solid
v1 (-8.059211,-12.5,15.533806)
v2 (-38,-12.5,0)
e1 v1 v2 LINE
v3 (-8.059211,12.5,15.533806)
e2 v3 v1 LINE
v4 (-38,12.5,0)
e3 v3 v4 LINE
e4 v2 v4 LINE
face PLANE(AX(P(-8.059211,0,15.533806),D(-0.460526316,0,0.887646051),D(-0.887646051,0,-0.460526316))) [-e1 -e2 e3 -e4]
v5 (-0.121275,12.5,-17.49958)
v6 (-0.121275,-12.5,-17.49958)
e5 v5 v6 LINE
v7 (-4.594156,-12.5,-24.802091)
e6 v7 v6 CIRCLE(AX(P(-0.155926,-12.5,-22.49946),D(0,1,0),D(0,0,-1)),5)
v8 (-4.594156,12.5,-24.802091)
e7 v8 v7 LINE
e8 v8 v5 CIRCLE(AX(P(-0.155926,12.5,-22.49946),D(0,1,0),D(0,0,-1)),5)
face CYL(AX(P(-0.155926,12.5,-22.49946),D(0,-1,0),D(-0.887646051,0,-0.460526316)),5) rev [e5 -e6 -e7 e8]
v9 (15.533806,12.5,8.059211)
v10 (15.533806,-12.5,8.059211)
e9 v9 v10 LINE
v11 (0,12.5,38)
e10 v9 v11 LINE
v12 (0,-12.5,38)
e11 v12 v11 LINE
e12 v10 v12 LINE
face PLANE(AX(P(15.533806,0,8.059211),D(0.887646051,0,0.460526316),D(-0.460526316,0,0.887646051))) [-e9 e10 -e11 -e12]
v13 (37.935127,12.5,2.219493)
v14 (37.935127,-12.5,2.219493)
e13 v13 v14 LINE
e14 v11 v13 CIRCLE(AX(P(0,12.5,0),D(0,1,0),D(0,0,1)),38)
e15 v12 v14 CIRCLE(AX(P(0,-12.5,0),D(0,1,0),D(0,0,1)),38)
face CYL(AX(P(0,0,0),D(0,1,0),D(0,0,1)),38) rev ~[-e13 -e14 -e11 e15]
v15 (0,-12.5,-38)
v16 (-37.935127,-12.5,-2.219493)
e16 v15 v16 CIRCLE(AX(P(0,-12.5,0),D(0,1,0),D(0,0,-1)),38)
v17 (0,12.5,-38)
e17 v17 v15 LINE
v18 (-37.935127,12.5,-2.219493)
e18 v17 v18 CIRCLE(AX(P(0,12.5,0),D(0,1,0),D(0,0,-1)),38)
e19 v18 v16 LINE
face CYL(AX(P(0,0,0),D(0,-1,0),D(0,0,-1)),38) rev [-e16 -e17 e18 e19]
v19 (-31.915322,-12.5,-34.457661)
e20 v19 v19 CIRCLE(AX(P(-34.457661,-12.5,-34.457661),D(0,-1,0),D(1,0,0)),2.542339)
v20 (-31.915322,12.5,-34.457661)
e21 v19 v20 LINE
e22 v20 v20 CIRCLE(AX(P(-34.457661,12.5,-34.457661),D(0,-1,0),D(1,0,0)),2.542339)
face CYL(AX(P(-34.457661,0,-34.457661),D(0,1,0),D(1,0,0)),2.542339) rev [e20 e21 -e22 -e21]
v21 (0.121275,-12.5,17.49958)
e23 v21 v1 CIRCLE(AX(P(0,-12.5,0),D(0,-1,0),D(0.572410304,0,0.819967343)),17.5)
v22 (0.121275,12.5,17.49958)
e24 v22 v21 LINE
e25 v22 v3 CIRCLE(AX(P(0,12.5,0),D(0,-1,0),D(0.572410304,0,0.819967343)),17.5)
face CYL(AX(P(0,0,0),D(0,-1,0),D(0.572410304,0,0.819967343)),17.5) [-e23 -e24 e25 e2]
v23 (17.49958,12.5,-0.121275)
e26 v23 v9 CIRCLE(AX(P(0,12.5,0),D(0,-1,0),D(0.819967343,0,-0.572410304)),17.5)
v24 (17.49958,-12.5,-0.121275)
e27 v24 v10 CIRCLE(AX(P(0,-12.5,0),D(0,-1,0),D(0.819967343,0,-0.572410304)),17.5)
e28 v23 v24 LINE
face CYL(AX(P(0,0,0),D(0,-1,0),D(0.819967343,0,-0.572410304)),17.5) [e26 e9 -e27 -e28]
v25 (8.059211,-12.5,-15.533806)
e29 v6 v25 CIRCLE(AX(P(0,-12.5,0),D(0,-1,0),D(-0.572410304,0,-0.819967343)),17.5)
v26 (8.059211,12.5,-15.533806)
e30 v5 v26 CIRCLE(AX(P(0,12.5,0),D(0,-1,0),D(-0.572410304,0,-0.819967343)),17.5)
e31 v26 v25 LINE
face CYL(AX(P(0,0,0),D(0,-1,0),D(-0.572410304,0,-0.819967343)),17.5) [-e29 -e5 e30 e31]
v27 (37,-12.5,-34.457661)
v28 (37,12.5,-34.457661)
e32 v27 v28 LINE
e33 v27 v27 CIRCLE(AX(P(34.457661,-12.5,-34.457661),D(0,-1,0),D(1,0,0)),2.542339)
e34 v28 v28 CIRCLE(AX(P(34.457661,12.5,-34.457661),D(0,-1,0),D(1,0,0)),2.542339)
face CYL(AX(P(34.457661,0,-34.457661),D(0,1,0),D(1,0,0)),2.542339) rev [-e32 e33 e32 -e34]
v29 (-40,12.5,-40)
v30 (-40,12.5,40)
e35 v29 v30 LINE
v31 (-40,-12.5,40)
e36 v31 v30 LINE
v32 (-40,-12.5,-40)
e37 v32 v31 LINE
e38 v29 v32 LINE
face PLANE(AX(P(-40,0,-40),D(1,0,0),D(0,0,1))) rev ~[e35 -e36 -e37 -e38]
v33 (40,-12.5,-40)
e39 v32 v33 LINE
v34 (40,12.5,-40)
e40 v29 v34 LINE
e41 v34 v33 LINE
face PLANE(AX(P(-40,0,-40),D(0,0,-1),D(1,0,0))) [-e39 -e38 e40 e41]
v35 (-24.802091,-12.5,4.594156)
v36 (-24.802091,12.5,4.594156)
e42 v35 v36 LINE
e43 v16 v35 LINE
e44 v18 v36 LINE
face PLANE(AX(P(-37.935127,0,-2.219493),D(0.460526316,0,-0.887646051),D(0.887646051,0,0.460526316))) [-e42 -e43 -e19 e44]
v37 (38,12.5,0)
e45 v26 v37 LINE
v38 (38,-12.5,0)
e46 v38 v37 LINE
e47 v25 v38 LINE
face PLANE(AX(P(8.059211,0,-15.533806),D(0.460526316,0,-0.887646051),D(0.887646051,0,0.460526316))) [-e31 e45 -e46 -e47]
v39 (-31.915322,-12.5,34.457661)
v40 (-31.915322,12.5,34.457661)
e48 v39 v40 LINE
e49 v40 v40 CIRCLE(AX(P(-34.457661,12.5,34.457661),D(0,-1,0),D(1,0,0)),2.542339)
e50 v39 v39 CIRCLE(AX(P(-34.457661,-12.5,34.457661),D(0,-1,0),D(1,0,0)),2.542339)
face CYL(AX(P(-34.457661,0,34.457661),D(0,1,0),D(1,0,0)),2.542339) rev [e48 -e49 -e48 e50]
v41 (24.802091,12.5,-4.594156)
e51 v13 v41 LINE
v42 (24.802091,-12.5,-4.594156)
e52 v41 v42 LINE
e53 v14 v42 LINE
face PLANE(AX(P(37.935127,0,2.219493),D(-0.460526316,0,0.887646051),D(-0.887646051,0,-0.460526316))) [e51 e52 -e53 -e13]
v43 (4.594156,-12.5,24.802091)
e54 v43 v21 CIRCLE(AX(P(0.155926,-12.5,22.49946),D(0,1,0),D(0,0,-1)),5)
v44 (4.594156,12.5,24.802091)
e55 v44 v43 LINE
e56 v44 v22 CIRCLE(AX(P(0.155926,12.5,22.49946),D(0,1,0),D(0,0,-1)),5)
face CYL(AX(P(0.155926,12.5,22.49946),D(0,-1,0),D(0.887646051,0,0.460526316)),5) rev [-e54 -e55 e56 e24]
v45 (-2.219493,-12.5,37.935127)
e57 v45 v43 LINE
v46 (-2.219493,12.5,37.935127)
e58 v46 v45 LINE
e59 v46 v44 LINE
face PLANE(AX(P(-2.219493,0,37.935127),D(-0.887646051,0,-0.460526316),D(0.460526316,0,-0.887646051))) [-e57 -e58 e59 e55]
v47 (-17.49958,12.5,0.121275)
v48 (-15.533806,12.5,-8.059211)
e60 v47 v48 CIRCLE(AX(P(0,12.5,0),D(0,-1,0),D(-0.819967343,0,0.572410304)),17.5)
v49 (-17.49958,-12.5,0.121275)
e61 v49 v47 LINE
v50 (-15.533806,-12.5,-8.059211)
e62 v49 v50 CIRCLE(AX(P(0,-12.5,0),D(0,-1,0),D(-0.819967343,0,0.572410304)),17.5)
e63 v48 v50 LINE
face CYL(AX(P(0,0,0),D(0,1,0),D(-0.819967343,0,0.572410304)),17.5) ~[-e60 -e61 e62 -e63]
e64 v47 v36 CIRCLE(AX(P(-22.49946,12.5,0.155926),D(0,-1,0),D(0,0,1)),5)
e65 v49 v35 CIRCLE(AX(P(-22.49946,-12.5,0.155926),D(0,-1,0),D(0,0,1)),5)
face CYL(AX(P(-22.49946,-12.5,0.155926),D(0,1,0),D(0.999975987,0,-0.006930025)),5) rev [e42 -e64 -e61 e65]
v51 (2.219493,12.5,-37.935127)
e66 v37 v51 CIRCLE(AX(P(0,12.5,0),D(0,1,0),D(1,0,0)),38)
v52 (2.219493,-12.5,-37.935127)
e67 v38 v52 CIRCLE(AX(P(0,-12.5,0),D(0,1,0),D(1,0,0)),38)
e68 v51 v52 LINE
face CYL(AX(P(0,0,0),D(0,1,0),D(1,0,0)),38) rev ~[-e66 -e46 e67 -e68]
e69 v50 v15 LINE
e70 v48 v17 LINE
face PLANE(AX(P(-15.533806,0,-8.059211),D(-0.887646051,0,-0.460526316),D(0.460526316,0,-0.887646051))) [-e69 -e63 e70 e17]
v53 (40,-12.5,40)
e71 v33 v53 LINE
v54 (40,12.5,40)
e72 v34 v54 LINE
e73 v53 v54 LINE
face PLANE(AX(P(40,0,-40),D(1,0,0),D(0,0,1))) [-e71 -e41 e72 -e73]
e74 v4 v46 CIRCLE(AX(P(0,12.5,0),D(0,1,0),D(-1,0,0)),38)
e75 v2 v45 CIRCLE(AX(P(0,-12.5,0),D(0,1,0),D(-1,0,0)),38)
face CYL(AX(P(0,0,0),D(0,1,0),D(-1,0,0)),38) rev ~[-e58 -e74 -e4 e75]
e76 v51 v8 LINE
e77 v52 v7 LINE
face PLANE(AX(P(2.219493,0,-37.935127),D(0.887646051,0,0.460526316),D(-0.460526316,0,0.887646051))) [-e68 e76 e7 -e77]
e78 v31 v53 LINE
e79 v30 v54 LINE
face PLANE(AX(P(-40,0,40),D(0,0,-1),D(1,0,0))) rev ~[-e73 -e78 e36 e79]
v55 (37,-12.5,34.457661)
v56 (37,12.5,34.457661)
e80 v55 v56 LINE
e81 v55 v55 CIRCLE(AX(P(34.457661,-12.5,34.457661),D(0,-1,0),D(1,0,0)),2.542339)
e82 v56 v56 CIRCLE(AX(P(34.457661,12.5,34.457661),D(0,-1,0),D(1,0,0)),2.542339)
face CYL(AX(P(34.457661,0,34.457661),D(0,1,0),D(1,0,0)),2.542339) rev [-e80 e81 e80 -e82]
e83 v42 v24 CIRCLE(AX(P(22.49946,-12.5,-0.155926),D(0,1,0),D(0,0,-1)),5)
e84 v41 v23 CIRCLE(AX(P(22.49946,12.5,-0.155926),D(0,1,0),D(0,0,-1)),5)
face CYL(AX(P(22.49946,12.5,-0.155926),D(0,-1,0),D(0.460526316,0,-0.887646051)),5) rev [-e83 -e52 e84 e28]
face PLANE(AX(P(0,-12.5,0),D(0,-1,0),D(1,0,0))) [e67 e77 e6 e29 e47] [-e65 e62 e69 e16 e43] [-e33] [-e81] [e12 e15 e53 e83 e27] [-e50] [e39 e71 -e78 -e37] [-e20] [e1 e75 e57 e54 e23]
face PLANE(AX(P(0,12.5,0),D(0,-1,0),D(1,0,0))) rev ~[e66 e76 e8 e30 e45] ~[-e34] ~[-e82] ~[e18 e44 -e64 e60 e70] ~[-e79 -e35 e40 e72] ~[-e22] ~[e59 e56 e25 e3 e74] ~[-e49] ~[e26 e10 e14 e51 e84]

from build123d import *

# Parameters (mm, degrees)
F0_W     = 80
F0_H     = 80
F0_R     = 2.5423391552
F1_DEPTH = 12.5
F2_R     = 5


with BuildPart() as f1:
    # F0 (on Front) → F1 (new body, symmetric)
    with BuildSketch(Plane.XZ):
        Rectangle(F0_W, F0_H)
        with Locations((-34.4576608448, -34.4576608448)):
            Circle(F0_R, mode=Mode.SUBTRACT)
        with BuildLine():
            Line((-37.9351268711, -2.219493022), (-14.3494285056, 10.01718032))
            ThreePointArc((-14.3494285056, 10.01718032), (-17.4625571186, 1.1441585906), (-15.5338058985, -8.0592105263))
            Line((-15.5338058985, -8.0592105263), (0, -38))
            ThreePointArc((0, -38), (-26.0735427701, -27.6436315888), (-37.9351268711, -2.219493022))
        make_face(mode=Mode.SUBTRACT)
        with Locations((34.4576608448, -34.4576608448)):
            Circle(F0_R, mode=Mode.SUBTRACT)
        with BuildLine():
            Line((8.0592105263, -15.5338058985), (38, 0))
            ThreePointArc((38, 0), (27.6436315888, -26.0735427701), (2.219493022, -37.9351268711))
            Line((2.219493022, -37.9351268711), (-10.01718032, -14.3494285056))
            ThreePointArc((-10.01718032, -14.3494285056), (-1.1441585906, -17.4625571186), (8.0592105263, -15.5338058985))
        make_face(mode=Mode.SUBTRACT)
        with BuildLine():
            Line((-8.0592105263, 15.5338058985), (-38, 0))
            ThreePointArc((-38, 0), (-27.6436315888, 26.0735427701), (-2.219493022, 37.9351268711))
            Line((-2.219493022, 37.9351268711), (10.01718032, 14.3494285056))
            ThreePointArc((10.01718032, 14.3494285056), (1.1441585906, 17.4625571186), (-8.0592105263, 15.5338058985))
        make_face(mode=Mode.SUBTRACT)
        with Locations((-34.4576608448, 34.4576608448)):
            Circle(F0_R, mode=Mode.SUBTRACT)
        with BuildLine():
            Line((15.5338058985, 8.0592105263), (0, 38))
            ThreePointArc((0, 38), (26.0735427701, 27.6436315888), (37.9351268711, 2.219493022))
            Line((37.9351268711, 2.219493022), (14.3494285056, -10.01718032))
            ThreePointArc((14.3494285056, -10.01718032), (17.4625571186, -1.1441585906), (15.5338058985, 8.0592105263))
        make_face(mode=Mode.SUBTRACT)
        with Locations((34.4576608448, 34.4576608448)):
            Circle(F0_R, mode=Mode.SUBTRACT)
    extrude(amount=F1_DEPTH, both=True)

    # F2
    f2_edges = [f1.edges().sort_by_distance(p)[0] for p in [
        (10.01718, 0, 14.349429),
        (-14.349429, 0, 10.01718),
        (-10.01718, 0, -14.349429),
        (14.349429, 0, -10.01718),
    ]]
    fillet(f2_edges, radius=F2_R)


solid = f1.part
